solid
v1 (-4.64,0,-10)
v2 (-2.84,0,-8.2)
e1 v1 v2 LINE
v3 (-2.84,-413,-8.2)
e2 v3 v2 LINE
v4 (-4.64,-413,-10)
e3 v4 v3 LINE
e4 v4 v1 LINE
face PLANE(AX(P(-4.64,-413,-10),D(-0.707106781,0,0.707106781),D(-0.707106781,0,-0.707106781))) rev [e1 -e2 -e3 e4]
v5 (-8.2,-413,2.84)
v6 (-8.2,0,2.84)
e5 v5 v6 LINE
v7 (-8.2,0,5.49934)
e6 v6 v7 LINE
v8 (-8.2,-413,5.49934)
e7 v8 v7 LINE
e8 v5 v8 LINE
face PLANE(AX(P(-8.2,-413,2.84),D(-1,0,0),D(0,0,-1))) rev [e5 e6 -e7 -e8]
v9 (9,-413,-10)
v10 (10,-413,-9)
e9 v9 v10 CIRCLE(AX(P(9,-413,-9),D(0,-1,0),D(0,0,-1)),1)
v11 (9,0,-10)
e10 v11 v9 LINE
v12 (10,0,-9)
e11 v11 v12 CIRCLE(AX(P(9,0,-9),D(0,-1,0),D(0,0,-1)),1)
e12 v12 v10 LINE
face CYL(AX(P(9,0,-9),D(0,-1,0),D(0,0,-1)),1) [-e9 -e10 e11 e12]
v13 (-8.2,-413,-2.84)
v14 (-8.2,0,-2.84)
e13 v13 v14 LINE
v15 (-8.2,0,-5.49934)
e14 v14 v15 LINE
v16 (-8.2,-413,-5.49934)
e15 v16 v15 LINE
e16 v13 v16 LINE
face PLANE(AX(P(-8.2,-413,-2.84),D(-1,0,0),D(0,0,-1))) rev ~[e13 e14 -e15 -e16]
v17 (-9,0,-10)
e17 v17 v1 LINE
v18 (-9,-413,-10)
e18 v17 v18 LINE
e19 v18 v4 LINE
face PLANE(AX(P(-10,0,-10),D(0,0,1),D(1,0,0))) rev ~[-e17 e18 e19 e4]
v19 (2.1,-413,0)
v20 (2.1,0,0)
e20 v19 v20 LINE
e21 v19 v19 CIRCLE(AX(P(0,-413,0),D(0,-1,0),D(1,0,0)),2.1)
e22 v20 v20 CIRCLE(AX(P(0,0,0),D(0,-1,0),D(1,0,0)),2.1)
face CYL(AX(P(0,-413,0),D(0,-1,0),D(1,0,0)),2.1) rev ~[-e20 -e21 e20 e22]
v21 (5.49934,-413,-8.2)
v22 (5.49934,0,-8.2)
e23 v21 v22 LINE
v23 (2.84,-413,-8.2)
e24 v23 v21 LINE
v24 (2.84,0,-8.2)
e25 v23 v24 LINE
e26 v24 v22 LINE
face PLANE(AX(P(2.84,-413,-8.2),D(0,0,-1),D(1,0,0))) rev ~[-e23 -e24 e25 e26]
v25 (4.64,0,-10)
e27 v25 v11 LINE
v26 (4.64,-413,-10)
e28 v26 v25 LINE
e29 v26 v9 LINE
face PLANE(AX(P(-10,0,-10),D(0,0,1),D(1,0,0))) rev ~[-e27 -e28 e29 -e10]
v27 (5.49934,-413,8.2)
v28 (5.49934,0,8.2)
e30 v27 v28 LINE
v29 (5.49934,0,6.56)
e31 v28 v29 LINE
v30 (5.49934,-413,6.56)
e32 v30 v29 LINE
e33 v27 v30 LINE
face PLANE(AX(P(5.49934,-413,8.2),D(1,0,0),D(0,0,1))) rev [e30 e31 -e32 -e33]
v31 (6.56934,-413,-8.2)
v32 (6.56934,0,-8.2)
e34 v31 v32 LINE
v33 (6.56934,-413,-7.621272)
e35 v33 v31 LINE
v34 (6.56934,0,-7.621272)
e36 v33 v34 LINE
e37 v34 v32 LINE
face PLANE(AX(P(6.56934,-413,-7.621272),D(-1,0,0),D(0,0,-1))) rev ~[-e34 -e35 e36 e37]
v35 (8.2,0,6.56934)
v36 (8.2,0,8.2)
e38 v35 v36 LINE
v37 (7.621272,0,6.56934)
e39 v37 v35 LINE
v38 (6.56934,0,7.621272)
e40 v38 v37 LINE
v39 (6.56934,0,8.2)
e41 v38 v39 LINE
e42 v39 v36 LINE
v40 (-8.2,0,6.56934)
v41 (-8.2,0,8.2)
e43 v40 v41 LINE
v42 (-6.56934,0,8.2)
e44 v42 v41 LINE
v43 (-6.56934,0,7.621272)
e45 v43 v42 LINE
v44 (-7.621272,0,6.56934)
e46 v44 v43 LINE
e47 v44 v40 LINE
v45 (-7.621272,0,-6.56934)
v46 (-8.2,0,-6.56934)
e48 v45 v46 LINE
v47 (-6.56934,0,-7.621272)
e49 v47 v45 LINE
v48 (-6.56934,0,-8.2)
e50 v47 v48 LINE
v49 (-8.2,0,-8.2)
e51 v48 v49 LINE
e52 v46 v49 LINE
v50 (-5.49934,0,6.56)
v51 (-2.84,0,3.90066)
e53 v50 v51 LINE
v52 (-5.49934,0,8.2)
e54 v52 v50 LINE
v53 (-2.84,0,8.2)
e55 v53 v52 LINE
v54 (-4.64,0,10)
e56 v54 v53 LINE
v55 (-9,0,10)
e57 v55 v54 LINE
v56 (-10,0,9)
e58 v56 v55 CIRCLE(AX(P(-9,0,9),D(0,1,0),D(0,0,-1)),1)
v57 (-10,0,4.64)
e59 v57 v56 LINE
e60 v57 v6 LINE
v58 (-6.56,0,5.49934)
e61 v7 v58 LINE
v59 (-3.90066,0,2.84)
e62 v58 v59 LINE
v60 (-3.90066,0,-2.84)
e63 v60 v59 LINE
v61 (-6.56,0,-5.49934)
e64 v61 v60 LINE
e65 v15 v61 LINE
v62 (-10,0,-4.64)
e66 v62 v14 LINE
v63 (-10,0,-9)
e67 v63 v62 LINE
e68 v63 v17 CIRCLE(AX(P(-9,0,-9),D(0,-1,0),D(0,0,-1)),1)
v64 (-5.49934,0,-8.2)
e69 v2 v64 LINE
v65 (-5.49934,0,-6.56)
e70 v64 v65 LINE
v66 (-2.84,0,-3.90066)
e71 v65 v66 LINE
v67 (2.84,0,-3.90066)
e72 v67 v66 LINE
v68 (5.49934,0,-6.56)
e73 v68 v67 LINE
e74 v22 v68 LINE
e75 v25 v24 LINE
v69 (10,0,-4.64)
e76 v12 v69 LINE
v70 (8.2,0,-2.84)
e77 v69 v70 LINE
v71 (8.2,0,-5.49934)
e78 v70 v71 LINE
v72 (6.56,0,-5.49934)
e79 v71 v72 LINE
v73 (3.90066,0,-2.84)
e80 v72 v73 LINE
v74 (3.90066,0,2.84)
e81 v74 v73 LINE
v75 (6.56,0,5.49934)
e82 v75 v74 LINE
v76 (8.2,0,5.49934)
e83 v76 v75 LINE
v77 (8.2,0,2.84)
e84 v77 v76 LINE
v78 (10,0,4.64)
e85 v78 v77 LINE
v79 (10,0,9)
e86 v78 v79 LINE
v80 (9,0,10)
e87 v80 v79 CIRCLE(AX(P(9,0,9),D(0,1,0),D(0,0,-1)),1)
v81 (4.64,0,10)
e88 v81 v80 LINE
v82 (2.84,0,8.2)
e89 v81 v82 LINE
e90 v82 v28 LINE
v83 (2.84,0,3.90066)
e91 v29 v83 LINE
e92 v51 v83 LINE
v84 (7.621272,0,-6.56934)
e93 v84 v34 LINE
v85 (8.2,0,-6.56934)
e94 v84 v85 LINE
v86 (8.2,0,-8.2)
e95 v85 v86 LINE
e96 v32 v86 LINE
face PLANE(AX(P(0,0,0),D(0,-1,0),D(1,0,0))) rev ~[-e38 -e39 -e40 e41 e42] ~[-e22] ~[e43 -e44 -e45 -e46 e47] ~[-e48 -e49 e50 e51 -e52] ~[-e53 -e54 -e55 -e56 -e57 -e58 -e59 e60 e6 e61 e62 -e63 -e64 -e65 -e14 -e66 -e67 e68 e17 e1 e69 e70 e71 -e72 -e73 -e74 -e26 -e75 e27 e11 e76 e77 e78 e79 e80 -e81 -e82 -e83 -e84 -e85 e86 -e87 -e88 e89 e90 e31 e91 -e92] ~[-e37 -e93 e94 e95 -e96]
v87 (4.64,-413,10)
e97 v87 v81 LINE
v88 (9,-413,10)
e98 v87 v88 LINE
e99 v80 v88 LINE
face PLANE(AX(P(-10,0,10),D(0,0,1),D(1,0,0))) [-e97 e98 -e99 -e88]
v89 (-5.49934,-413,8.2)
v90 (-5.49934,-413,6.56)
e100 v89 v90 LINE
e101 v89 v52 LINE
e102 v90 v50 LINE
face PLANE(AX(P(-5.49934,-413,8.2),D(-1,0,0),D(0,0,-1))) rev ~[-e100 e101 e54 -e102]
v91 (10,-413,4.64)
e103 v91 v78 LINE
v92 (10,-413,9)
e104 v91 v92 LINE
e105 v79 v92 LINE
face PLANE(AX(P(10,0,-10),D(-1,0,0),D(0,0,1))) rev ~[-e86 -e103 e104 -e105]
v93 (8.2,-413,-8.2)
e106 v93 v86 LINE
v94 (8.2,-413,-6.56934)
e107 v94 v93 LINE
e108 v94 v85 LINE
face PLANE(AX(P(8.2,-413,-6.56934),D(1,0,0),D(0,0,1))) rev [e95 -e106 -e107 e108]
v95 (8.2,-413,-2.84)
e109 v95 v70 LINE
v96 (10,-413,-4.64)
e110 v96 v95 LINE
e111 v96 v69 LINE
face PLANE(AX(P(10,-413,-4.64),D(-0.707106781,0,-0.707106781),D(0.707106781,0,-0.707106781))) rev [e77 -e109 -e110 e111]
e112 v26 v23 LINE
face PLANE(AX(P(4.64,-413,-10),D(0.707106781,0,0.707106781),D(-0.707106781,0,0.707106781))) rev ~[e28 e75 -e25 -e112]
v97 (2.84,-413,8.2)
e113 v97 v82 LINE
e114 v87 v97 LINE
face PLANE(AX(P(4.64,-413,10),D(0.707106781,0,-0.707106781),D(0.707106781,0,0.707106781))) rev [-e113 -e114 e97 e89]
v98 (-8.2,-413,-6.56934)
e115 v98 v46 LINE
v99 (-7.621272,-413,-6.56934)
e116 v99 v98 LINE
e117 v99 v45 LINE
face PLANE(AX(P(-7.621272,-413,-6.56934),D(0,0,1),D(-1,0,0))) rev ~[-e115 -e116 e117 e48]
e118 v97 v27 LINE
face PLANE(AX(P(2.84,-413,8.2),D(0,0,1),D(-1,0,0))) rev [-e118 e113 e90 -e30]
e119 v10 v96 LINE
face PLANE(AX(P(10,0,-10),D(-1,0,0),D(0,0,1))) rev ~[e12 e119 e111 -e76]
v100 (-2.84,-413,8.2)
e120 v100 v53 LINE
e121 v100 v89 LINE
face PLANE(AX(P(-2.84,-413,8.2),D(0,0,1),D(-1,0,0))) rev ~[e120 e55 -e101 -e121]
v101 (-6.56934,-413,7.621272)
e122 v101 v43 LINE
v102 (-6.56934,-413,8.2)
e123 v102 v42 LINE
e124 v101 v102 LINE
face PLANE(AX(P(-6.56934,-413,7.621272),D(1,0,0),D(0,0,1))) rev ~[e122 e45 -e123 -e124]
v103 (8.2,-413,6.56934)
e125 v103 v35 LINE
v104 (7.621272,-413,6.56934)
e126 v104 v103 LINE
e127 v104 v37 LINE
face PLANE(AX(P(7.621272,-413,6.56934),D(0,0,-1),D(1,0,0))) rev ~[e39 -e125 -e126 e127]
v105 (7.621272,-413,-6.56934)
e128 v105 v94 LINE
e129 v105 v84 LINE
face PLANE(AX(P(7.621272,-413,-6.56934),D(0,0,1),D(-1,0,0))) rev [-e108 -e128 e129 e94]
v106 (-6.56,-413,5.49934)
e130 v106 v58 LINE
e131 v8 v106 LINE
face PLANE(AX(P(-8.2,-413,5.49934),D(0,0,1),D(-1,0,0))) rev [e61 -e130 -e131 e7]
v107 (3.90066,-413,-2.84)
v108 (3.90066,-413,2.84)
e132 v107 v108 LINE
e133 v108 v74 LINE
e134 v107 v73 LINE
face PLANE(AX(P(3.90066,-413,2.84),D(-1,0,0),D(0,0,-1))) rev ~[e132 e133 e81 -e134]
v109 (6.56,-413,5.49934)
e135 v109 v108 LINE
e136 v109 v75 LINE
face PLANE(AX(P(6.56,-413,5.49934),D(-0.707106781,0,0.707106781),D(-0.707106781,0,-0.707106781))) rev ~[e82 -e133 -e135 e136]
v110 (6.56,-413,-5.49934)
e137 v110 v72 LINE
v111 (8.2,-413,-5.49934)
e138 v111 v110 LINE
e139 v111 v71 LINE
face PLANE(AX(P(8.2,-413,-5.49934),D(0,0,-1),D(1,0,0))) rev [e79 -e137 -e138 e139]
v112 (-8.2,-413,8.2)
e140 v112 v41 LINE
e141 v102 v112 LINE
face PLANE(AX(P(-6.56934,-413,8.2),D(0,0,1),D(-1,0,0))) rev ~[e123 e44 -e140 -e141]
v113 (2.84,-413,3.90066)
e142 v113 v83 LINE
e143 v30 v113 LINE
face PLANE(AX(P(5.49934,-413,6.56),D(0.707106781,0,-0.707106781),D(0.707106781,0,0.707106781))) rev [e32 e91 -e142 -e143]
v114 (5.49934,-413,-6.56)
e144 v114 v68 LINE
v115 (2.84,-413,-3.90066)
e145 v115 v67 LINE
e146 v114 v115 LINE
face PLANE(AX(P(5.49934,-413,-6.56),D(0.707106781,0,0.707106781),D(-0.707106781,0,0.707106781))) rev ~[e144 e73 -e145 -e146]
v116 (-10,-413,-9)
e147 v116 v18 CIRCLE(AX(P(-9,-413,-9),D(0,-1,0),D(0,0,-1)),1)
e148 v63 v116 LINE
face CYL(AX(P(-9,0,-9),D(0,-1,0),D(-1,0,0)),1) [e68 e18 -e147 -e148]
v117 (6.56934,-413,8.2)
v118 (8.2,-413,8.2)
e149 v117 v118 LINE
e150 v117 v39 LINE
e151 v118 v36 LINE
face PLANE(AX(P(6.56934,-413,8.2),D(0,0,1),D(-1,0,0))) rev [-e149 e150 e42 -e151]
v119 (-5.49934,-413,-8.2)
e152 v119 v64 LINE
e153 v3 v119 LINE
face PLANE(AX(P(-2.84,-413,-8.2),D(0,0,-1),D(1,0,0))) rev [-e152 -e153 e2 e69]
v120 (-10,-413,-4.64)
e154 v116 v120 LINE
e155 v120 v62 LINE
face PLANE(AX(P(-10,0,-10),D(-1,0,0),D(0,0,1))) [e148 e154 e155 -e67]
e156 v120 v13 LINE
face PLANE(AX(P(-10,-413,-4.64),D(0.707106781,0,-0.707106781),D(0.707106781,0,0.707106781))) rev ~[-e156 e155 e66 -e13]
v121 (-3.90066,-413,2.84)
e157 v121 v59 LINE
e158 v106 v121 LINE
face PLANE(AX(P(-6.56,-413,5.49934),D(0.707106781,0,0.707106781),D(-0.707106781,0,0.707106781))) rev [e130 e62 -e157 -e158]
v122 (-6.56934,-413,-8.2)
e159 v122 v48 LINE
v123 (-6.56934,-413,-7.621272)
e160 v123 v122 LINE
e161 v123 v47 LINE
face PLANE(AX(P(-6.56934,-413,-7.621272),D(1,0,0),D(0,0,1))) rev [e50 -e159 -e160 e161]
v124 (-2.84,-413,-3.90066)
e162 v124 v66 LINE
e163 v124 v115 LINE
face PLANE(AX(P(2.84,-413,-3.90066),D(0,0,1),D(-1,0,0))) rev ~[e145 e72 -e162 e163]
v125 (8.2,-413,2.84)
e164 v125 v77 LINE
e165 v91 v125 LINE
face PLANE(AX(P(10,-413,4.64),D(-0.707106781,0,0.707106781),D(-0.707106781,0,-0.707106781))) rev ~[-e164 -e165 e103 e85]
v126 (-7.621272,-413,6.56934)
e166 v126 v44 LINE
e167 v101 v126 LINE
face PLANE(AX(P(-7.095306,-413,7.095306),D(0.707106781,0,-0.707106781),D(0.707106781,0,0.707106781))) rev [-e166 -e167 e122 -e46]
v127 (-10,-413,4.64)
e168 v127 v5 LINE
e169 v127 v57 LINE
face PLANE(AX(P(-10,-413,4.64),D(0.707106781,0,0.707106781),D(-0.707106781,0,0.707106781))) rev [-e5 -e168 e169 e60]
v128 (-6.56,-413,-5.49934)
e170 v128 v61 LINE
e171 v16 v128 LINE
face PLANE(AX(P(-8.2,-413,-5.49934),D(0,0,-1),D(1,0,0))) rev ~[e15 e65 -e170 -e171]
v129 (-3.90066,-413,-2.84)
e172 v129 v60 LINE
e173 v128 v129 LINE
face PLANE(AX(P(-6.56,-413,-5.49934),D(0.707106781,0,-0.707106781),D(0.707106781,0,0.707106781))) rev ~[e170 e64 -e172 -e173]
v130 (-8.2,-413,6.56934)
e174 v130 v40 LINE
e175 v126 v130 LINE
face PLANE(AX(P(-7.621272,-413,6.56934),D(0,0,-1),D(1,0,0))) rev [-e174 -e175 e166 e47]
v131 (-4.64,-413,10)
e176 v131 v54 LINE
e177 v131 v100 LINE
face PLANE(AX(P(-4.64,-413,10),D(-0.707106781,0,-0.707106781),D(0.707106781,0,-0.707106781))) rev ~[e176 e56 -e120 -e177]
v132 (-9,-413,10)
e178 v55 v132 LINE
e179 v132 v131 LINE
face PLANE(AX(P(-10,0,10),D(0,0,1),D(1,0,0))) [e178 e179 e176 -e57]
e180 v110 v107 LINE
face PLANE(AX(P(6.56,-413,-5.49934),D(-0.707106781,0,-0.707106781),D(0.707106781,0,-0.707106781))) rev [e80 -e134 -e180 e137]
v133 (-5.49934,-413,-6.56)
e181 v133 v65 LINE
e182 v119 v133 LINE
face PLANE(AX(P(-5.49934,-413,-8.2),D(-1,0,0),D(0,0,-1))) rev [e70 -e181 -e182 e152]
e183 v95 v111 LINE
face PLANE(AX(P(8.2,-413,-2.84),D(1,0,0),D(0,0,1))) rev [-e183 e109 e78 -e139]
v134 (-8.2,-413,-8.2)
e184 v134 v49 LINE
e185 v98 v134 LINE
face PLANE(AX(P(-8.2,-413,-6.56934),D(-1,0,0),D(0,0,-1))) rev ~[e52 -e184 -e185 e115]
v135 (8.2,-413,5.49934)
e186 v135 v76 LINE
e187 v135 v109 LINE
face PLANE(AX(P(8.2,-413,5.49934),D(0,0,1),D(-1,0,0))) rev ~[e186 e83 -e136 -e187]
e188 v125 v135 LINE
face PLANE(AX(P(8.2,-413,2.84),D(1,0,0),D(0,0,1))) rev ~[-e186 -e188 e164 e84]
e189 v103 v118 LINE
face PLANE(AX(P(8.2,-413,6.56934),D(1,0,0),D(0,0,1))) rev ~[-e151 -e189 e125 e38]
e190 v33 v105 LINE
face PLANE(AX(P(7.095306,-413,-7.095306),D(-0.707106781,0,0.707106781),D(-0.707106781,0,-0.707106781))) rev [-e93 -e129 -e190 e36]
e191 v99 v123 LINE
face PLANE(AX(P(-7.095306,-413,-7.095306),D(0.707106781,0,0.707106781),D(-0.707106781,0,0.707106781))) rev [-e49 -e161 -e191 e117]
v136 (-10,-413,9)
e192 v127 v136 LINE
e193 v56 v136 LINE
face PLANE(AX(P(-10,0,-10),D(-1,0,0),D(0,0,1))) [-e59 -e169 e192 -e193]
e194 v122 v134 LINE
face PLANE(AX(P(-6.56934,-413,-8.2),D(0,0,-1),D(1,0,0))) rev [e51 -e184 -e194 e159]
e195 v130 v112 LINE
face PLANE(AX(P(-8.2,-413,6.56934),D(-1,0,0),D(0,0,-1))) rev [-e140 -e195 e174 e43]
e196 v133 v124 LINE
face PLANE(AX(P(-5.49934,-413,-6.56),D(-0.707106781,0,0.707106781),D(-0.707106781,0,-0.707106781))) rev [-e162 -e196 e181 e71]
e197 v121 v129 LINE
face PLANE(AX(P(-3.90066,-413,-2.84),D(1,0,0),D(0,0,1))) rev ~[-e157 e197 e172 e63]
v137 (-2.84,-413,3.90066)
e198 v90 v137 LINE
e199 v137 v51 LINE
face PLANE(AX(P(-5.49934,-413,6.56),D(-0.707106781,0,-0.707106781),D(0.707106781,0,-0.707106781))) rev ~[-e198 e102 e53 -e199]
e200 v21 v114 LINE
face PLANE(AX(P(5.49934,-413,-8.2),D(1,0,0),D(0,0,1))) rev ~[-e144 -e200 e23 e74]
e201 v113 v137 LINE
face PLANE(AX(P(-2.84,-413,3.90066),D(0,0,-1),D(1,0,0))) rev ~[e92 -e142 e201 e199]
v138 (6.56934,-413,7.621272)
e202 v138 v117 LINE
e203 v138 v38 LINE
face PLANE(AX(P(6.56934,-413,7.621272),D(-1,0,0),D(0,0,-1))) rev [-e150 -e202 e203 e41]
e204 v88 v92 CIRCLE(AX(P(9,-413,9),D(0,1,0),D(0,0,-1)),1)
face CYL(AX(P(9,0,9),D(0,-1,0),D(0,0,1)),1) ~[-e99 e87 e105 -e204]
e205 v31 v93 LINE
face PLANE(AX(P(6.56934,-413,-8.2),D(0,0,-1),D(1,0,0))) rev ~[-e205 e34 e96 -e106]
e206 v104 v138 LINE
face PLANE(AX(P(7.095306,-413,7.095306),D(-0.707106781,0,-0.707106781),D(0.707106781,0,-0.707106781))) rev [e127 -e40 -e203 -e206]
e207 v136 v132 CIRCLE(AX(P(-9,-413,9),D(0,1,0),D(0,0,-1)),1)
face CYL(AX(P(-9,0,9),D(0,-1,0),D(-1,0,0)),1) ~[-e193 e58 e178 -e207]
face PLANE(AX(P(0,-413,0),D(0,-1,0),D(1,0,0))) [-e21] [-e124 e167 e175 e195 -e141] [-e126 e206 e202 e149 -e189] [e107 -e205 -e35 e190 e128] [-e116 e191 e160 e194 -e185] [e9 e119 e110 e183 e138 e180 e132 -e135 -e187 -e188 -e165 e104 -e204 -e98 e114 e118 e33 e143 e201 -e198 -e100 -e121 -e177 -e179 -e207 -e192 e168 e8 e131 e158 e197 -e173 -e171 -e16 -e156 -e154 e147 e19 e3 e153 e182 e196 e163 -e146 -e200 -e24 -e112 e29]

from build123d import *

# Parameters (mm, degrees)
F0_W            = 20
F0_H            = 20
F1_DEPTH        = 413
F2_R            = 2.1
F3_DEPTH        = 413.001
F4_R            = 1
F6_DEPTH        = 413.001
F6_COPIES_COUNT = 4


# Not quite as in the source:
# - a pattern or mirror of a feature is missing from the dataset's text; its kind, count and spacing are read off the source's solid


with BuildPart() as f1:
    # F0 (on Front) → F1 (new body)
    with BuildSketch(Plane.XZ):
        Rectangle(F0_W, F0_H)
    extrude(amount=F1_DEPTH)

    # F2 (on face) → F3 (cut, through all)
    with BuildSketch(Plane.XZ.offset(413)):
        Circle(F2_R)
    extrude(amount=-F3_DEPTH, mode=Mode.SUBTRACT)

    # F4
    f4_edges = [f1.edges().sort_by_distance(p)[0] for p in [
        (-10, -206.5, 10),
        (10, -206.5, 10),
        (10, -206.5, -10),
        (-10, -206.5, -10),
    ]]
    fillet(f4_edges, radius=F4_R)

    # F5 (on face) → F6 (cut, through all)
    with BuildSketch(Plane.XZ.offset(413)):
        Polygon((0, 3.9006601718), (0, 10), (-2.84, 10), (-4.64, 10), (-2.84, 8.2), (-5.4993398282, 8.2), (-5.4993398282, 6.56), (-2.84, 3.9006601718), align=None)
        Polygon((-6.5693398282, 8.2), (-8.2, 8.2), (-7.0953059148, 7.0953059148), (-6.5693398282, 7.6212720014), align=None)
    f6 = extrude(amount=-F6_DEPTH, mode=Mode.SUBTRACT)

    # F6_copies: F6 ×4 about axis
    f6_copies_axis = Axis((0, 0, 0), (0, 1, 0))
    for i in range(1, F6_COPIES_COUNT):
        add(f6.rotate(f6_copies_axis, i * 360 / F6_COPIES_COUNT), mode=Mode.SUBTRACT)

    # F6_copies1: F6 across plane
    add(f6.mirror(Plane(origin=(0, 0, 0), x_dir=(-0.7071067812, 0, -0.7071067812), z_dir=(0.7071067812, 0, -0.7071067812))), mode=Mode.SUBTRACT)

    # F6_copies2: F6 across plane
    add(f6.mirror(Plane(origin=(0, 0, 0), x_dir=(-1, 0, 0), z_dir=(0, 0, -1))), mode=Mode.SUBTRACT)

    # F6_copies3: F6 across plane
    add(f6.mirror(Plane(origin=(0, 0, 0), x_dir=(0, 0, 1), z_dir=(1, 0, 0))), mode=Mode.SUBTRACT)

    # F6_copies4: F6 across plane
    add(f6.mirror(Plane(origin=(0, 0, 0), x_dir=(0.7071067812, 0, -0.7071067812), z_dir=(-0.7071067812, 0, -0.7071067812))), mode=Mode.SUBTRACT)


solid = f1.part
